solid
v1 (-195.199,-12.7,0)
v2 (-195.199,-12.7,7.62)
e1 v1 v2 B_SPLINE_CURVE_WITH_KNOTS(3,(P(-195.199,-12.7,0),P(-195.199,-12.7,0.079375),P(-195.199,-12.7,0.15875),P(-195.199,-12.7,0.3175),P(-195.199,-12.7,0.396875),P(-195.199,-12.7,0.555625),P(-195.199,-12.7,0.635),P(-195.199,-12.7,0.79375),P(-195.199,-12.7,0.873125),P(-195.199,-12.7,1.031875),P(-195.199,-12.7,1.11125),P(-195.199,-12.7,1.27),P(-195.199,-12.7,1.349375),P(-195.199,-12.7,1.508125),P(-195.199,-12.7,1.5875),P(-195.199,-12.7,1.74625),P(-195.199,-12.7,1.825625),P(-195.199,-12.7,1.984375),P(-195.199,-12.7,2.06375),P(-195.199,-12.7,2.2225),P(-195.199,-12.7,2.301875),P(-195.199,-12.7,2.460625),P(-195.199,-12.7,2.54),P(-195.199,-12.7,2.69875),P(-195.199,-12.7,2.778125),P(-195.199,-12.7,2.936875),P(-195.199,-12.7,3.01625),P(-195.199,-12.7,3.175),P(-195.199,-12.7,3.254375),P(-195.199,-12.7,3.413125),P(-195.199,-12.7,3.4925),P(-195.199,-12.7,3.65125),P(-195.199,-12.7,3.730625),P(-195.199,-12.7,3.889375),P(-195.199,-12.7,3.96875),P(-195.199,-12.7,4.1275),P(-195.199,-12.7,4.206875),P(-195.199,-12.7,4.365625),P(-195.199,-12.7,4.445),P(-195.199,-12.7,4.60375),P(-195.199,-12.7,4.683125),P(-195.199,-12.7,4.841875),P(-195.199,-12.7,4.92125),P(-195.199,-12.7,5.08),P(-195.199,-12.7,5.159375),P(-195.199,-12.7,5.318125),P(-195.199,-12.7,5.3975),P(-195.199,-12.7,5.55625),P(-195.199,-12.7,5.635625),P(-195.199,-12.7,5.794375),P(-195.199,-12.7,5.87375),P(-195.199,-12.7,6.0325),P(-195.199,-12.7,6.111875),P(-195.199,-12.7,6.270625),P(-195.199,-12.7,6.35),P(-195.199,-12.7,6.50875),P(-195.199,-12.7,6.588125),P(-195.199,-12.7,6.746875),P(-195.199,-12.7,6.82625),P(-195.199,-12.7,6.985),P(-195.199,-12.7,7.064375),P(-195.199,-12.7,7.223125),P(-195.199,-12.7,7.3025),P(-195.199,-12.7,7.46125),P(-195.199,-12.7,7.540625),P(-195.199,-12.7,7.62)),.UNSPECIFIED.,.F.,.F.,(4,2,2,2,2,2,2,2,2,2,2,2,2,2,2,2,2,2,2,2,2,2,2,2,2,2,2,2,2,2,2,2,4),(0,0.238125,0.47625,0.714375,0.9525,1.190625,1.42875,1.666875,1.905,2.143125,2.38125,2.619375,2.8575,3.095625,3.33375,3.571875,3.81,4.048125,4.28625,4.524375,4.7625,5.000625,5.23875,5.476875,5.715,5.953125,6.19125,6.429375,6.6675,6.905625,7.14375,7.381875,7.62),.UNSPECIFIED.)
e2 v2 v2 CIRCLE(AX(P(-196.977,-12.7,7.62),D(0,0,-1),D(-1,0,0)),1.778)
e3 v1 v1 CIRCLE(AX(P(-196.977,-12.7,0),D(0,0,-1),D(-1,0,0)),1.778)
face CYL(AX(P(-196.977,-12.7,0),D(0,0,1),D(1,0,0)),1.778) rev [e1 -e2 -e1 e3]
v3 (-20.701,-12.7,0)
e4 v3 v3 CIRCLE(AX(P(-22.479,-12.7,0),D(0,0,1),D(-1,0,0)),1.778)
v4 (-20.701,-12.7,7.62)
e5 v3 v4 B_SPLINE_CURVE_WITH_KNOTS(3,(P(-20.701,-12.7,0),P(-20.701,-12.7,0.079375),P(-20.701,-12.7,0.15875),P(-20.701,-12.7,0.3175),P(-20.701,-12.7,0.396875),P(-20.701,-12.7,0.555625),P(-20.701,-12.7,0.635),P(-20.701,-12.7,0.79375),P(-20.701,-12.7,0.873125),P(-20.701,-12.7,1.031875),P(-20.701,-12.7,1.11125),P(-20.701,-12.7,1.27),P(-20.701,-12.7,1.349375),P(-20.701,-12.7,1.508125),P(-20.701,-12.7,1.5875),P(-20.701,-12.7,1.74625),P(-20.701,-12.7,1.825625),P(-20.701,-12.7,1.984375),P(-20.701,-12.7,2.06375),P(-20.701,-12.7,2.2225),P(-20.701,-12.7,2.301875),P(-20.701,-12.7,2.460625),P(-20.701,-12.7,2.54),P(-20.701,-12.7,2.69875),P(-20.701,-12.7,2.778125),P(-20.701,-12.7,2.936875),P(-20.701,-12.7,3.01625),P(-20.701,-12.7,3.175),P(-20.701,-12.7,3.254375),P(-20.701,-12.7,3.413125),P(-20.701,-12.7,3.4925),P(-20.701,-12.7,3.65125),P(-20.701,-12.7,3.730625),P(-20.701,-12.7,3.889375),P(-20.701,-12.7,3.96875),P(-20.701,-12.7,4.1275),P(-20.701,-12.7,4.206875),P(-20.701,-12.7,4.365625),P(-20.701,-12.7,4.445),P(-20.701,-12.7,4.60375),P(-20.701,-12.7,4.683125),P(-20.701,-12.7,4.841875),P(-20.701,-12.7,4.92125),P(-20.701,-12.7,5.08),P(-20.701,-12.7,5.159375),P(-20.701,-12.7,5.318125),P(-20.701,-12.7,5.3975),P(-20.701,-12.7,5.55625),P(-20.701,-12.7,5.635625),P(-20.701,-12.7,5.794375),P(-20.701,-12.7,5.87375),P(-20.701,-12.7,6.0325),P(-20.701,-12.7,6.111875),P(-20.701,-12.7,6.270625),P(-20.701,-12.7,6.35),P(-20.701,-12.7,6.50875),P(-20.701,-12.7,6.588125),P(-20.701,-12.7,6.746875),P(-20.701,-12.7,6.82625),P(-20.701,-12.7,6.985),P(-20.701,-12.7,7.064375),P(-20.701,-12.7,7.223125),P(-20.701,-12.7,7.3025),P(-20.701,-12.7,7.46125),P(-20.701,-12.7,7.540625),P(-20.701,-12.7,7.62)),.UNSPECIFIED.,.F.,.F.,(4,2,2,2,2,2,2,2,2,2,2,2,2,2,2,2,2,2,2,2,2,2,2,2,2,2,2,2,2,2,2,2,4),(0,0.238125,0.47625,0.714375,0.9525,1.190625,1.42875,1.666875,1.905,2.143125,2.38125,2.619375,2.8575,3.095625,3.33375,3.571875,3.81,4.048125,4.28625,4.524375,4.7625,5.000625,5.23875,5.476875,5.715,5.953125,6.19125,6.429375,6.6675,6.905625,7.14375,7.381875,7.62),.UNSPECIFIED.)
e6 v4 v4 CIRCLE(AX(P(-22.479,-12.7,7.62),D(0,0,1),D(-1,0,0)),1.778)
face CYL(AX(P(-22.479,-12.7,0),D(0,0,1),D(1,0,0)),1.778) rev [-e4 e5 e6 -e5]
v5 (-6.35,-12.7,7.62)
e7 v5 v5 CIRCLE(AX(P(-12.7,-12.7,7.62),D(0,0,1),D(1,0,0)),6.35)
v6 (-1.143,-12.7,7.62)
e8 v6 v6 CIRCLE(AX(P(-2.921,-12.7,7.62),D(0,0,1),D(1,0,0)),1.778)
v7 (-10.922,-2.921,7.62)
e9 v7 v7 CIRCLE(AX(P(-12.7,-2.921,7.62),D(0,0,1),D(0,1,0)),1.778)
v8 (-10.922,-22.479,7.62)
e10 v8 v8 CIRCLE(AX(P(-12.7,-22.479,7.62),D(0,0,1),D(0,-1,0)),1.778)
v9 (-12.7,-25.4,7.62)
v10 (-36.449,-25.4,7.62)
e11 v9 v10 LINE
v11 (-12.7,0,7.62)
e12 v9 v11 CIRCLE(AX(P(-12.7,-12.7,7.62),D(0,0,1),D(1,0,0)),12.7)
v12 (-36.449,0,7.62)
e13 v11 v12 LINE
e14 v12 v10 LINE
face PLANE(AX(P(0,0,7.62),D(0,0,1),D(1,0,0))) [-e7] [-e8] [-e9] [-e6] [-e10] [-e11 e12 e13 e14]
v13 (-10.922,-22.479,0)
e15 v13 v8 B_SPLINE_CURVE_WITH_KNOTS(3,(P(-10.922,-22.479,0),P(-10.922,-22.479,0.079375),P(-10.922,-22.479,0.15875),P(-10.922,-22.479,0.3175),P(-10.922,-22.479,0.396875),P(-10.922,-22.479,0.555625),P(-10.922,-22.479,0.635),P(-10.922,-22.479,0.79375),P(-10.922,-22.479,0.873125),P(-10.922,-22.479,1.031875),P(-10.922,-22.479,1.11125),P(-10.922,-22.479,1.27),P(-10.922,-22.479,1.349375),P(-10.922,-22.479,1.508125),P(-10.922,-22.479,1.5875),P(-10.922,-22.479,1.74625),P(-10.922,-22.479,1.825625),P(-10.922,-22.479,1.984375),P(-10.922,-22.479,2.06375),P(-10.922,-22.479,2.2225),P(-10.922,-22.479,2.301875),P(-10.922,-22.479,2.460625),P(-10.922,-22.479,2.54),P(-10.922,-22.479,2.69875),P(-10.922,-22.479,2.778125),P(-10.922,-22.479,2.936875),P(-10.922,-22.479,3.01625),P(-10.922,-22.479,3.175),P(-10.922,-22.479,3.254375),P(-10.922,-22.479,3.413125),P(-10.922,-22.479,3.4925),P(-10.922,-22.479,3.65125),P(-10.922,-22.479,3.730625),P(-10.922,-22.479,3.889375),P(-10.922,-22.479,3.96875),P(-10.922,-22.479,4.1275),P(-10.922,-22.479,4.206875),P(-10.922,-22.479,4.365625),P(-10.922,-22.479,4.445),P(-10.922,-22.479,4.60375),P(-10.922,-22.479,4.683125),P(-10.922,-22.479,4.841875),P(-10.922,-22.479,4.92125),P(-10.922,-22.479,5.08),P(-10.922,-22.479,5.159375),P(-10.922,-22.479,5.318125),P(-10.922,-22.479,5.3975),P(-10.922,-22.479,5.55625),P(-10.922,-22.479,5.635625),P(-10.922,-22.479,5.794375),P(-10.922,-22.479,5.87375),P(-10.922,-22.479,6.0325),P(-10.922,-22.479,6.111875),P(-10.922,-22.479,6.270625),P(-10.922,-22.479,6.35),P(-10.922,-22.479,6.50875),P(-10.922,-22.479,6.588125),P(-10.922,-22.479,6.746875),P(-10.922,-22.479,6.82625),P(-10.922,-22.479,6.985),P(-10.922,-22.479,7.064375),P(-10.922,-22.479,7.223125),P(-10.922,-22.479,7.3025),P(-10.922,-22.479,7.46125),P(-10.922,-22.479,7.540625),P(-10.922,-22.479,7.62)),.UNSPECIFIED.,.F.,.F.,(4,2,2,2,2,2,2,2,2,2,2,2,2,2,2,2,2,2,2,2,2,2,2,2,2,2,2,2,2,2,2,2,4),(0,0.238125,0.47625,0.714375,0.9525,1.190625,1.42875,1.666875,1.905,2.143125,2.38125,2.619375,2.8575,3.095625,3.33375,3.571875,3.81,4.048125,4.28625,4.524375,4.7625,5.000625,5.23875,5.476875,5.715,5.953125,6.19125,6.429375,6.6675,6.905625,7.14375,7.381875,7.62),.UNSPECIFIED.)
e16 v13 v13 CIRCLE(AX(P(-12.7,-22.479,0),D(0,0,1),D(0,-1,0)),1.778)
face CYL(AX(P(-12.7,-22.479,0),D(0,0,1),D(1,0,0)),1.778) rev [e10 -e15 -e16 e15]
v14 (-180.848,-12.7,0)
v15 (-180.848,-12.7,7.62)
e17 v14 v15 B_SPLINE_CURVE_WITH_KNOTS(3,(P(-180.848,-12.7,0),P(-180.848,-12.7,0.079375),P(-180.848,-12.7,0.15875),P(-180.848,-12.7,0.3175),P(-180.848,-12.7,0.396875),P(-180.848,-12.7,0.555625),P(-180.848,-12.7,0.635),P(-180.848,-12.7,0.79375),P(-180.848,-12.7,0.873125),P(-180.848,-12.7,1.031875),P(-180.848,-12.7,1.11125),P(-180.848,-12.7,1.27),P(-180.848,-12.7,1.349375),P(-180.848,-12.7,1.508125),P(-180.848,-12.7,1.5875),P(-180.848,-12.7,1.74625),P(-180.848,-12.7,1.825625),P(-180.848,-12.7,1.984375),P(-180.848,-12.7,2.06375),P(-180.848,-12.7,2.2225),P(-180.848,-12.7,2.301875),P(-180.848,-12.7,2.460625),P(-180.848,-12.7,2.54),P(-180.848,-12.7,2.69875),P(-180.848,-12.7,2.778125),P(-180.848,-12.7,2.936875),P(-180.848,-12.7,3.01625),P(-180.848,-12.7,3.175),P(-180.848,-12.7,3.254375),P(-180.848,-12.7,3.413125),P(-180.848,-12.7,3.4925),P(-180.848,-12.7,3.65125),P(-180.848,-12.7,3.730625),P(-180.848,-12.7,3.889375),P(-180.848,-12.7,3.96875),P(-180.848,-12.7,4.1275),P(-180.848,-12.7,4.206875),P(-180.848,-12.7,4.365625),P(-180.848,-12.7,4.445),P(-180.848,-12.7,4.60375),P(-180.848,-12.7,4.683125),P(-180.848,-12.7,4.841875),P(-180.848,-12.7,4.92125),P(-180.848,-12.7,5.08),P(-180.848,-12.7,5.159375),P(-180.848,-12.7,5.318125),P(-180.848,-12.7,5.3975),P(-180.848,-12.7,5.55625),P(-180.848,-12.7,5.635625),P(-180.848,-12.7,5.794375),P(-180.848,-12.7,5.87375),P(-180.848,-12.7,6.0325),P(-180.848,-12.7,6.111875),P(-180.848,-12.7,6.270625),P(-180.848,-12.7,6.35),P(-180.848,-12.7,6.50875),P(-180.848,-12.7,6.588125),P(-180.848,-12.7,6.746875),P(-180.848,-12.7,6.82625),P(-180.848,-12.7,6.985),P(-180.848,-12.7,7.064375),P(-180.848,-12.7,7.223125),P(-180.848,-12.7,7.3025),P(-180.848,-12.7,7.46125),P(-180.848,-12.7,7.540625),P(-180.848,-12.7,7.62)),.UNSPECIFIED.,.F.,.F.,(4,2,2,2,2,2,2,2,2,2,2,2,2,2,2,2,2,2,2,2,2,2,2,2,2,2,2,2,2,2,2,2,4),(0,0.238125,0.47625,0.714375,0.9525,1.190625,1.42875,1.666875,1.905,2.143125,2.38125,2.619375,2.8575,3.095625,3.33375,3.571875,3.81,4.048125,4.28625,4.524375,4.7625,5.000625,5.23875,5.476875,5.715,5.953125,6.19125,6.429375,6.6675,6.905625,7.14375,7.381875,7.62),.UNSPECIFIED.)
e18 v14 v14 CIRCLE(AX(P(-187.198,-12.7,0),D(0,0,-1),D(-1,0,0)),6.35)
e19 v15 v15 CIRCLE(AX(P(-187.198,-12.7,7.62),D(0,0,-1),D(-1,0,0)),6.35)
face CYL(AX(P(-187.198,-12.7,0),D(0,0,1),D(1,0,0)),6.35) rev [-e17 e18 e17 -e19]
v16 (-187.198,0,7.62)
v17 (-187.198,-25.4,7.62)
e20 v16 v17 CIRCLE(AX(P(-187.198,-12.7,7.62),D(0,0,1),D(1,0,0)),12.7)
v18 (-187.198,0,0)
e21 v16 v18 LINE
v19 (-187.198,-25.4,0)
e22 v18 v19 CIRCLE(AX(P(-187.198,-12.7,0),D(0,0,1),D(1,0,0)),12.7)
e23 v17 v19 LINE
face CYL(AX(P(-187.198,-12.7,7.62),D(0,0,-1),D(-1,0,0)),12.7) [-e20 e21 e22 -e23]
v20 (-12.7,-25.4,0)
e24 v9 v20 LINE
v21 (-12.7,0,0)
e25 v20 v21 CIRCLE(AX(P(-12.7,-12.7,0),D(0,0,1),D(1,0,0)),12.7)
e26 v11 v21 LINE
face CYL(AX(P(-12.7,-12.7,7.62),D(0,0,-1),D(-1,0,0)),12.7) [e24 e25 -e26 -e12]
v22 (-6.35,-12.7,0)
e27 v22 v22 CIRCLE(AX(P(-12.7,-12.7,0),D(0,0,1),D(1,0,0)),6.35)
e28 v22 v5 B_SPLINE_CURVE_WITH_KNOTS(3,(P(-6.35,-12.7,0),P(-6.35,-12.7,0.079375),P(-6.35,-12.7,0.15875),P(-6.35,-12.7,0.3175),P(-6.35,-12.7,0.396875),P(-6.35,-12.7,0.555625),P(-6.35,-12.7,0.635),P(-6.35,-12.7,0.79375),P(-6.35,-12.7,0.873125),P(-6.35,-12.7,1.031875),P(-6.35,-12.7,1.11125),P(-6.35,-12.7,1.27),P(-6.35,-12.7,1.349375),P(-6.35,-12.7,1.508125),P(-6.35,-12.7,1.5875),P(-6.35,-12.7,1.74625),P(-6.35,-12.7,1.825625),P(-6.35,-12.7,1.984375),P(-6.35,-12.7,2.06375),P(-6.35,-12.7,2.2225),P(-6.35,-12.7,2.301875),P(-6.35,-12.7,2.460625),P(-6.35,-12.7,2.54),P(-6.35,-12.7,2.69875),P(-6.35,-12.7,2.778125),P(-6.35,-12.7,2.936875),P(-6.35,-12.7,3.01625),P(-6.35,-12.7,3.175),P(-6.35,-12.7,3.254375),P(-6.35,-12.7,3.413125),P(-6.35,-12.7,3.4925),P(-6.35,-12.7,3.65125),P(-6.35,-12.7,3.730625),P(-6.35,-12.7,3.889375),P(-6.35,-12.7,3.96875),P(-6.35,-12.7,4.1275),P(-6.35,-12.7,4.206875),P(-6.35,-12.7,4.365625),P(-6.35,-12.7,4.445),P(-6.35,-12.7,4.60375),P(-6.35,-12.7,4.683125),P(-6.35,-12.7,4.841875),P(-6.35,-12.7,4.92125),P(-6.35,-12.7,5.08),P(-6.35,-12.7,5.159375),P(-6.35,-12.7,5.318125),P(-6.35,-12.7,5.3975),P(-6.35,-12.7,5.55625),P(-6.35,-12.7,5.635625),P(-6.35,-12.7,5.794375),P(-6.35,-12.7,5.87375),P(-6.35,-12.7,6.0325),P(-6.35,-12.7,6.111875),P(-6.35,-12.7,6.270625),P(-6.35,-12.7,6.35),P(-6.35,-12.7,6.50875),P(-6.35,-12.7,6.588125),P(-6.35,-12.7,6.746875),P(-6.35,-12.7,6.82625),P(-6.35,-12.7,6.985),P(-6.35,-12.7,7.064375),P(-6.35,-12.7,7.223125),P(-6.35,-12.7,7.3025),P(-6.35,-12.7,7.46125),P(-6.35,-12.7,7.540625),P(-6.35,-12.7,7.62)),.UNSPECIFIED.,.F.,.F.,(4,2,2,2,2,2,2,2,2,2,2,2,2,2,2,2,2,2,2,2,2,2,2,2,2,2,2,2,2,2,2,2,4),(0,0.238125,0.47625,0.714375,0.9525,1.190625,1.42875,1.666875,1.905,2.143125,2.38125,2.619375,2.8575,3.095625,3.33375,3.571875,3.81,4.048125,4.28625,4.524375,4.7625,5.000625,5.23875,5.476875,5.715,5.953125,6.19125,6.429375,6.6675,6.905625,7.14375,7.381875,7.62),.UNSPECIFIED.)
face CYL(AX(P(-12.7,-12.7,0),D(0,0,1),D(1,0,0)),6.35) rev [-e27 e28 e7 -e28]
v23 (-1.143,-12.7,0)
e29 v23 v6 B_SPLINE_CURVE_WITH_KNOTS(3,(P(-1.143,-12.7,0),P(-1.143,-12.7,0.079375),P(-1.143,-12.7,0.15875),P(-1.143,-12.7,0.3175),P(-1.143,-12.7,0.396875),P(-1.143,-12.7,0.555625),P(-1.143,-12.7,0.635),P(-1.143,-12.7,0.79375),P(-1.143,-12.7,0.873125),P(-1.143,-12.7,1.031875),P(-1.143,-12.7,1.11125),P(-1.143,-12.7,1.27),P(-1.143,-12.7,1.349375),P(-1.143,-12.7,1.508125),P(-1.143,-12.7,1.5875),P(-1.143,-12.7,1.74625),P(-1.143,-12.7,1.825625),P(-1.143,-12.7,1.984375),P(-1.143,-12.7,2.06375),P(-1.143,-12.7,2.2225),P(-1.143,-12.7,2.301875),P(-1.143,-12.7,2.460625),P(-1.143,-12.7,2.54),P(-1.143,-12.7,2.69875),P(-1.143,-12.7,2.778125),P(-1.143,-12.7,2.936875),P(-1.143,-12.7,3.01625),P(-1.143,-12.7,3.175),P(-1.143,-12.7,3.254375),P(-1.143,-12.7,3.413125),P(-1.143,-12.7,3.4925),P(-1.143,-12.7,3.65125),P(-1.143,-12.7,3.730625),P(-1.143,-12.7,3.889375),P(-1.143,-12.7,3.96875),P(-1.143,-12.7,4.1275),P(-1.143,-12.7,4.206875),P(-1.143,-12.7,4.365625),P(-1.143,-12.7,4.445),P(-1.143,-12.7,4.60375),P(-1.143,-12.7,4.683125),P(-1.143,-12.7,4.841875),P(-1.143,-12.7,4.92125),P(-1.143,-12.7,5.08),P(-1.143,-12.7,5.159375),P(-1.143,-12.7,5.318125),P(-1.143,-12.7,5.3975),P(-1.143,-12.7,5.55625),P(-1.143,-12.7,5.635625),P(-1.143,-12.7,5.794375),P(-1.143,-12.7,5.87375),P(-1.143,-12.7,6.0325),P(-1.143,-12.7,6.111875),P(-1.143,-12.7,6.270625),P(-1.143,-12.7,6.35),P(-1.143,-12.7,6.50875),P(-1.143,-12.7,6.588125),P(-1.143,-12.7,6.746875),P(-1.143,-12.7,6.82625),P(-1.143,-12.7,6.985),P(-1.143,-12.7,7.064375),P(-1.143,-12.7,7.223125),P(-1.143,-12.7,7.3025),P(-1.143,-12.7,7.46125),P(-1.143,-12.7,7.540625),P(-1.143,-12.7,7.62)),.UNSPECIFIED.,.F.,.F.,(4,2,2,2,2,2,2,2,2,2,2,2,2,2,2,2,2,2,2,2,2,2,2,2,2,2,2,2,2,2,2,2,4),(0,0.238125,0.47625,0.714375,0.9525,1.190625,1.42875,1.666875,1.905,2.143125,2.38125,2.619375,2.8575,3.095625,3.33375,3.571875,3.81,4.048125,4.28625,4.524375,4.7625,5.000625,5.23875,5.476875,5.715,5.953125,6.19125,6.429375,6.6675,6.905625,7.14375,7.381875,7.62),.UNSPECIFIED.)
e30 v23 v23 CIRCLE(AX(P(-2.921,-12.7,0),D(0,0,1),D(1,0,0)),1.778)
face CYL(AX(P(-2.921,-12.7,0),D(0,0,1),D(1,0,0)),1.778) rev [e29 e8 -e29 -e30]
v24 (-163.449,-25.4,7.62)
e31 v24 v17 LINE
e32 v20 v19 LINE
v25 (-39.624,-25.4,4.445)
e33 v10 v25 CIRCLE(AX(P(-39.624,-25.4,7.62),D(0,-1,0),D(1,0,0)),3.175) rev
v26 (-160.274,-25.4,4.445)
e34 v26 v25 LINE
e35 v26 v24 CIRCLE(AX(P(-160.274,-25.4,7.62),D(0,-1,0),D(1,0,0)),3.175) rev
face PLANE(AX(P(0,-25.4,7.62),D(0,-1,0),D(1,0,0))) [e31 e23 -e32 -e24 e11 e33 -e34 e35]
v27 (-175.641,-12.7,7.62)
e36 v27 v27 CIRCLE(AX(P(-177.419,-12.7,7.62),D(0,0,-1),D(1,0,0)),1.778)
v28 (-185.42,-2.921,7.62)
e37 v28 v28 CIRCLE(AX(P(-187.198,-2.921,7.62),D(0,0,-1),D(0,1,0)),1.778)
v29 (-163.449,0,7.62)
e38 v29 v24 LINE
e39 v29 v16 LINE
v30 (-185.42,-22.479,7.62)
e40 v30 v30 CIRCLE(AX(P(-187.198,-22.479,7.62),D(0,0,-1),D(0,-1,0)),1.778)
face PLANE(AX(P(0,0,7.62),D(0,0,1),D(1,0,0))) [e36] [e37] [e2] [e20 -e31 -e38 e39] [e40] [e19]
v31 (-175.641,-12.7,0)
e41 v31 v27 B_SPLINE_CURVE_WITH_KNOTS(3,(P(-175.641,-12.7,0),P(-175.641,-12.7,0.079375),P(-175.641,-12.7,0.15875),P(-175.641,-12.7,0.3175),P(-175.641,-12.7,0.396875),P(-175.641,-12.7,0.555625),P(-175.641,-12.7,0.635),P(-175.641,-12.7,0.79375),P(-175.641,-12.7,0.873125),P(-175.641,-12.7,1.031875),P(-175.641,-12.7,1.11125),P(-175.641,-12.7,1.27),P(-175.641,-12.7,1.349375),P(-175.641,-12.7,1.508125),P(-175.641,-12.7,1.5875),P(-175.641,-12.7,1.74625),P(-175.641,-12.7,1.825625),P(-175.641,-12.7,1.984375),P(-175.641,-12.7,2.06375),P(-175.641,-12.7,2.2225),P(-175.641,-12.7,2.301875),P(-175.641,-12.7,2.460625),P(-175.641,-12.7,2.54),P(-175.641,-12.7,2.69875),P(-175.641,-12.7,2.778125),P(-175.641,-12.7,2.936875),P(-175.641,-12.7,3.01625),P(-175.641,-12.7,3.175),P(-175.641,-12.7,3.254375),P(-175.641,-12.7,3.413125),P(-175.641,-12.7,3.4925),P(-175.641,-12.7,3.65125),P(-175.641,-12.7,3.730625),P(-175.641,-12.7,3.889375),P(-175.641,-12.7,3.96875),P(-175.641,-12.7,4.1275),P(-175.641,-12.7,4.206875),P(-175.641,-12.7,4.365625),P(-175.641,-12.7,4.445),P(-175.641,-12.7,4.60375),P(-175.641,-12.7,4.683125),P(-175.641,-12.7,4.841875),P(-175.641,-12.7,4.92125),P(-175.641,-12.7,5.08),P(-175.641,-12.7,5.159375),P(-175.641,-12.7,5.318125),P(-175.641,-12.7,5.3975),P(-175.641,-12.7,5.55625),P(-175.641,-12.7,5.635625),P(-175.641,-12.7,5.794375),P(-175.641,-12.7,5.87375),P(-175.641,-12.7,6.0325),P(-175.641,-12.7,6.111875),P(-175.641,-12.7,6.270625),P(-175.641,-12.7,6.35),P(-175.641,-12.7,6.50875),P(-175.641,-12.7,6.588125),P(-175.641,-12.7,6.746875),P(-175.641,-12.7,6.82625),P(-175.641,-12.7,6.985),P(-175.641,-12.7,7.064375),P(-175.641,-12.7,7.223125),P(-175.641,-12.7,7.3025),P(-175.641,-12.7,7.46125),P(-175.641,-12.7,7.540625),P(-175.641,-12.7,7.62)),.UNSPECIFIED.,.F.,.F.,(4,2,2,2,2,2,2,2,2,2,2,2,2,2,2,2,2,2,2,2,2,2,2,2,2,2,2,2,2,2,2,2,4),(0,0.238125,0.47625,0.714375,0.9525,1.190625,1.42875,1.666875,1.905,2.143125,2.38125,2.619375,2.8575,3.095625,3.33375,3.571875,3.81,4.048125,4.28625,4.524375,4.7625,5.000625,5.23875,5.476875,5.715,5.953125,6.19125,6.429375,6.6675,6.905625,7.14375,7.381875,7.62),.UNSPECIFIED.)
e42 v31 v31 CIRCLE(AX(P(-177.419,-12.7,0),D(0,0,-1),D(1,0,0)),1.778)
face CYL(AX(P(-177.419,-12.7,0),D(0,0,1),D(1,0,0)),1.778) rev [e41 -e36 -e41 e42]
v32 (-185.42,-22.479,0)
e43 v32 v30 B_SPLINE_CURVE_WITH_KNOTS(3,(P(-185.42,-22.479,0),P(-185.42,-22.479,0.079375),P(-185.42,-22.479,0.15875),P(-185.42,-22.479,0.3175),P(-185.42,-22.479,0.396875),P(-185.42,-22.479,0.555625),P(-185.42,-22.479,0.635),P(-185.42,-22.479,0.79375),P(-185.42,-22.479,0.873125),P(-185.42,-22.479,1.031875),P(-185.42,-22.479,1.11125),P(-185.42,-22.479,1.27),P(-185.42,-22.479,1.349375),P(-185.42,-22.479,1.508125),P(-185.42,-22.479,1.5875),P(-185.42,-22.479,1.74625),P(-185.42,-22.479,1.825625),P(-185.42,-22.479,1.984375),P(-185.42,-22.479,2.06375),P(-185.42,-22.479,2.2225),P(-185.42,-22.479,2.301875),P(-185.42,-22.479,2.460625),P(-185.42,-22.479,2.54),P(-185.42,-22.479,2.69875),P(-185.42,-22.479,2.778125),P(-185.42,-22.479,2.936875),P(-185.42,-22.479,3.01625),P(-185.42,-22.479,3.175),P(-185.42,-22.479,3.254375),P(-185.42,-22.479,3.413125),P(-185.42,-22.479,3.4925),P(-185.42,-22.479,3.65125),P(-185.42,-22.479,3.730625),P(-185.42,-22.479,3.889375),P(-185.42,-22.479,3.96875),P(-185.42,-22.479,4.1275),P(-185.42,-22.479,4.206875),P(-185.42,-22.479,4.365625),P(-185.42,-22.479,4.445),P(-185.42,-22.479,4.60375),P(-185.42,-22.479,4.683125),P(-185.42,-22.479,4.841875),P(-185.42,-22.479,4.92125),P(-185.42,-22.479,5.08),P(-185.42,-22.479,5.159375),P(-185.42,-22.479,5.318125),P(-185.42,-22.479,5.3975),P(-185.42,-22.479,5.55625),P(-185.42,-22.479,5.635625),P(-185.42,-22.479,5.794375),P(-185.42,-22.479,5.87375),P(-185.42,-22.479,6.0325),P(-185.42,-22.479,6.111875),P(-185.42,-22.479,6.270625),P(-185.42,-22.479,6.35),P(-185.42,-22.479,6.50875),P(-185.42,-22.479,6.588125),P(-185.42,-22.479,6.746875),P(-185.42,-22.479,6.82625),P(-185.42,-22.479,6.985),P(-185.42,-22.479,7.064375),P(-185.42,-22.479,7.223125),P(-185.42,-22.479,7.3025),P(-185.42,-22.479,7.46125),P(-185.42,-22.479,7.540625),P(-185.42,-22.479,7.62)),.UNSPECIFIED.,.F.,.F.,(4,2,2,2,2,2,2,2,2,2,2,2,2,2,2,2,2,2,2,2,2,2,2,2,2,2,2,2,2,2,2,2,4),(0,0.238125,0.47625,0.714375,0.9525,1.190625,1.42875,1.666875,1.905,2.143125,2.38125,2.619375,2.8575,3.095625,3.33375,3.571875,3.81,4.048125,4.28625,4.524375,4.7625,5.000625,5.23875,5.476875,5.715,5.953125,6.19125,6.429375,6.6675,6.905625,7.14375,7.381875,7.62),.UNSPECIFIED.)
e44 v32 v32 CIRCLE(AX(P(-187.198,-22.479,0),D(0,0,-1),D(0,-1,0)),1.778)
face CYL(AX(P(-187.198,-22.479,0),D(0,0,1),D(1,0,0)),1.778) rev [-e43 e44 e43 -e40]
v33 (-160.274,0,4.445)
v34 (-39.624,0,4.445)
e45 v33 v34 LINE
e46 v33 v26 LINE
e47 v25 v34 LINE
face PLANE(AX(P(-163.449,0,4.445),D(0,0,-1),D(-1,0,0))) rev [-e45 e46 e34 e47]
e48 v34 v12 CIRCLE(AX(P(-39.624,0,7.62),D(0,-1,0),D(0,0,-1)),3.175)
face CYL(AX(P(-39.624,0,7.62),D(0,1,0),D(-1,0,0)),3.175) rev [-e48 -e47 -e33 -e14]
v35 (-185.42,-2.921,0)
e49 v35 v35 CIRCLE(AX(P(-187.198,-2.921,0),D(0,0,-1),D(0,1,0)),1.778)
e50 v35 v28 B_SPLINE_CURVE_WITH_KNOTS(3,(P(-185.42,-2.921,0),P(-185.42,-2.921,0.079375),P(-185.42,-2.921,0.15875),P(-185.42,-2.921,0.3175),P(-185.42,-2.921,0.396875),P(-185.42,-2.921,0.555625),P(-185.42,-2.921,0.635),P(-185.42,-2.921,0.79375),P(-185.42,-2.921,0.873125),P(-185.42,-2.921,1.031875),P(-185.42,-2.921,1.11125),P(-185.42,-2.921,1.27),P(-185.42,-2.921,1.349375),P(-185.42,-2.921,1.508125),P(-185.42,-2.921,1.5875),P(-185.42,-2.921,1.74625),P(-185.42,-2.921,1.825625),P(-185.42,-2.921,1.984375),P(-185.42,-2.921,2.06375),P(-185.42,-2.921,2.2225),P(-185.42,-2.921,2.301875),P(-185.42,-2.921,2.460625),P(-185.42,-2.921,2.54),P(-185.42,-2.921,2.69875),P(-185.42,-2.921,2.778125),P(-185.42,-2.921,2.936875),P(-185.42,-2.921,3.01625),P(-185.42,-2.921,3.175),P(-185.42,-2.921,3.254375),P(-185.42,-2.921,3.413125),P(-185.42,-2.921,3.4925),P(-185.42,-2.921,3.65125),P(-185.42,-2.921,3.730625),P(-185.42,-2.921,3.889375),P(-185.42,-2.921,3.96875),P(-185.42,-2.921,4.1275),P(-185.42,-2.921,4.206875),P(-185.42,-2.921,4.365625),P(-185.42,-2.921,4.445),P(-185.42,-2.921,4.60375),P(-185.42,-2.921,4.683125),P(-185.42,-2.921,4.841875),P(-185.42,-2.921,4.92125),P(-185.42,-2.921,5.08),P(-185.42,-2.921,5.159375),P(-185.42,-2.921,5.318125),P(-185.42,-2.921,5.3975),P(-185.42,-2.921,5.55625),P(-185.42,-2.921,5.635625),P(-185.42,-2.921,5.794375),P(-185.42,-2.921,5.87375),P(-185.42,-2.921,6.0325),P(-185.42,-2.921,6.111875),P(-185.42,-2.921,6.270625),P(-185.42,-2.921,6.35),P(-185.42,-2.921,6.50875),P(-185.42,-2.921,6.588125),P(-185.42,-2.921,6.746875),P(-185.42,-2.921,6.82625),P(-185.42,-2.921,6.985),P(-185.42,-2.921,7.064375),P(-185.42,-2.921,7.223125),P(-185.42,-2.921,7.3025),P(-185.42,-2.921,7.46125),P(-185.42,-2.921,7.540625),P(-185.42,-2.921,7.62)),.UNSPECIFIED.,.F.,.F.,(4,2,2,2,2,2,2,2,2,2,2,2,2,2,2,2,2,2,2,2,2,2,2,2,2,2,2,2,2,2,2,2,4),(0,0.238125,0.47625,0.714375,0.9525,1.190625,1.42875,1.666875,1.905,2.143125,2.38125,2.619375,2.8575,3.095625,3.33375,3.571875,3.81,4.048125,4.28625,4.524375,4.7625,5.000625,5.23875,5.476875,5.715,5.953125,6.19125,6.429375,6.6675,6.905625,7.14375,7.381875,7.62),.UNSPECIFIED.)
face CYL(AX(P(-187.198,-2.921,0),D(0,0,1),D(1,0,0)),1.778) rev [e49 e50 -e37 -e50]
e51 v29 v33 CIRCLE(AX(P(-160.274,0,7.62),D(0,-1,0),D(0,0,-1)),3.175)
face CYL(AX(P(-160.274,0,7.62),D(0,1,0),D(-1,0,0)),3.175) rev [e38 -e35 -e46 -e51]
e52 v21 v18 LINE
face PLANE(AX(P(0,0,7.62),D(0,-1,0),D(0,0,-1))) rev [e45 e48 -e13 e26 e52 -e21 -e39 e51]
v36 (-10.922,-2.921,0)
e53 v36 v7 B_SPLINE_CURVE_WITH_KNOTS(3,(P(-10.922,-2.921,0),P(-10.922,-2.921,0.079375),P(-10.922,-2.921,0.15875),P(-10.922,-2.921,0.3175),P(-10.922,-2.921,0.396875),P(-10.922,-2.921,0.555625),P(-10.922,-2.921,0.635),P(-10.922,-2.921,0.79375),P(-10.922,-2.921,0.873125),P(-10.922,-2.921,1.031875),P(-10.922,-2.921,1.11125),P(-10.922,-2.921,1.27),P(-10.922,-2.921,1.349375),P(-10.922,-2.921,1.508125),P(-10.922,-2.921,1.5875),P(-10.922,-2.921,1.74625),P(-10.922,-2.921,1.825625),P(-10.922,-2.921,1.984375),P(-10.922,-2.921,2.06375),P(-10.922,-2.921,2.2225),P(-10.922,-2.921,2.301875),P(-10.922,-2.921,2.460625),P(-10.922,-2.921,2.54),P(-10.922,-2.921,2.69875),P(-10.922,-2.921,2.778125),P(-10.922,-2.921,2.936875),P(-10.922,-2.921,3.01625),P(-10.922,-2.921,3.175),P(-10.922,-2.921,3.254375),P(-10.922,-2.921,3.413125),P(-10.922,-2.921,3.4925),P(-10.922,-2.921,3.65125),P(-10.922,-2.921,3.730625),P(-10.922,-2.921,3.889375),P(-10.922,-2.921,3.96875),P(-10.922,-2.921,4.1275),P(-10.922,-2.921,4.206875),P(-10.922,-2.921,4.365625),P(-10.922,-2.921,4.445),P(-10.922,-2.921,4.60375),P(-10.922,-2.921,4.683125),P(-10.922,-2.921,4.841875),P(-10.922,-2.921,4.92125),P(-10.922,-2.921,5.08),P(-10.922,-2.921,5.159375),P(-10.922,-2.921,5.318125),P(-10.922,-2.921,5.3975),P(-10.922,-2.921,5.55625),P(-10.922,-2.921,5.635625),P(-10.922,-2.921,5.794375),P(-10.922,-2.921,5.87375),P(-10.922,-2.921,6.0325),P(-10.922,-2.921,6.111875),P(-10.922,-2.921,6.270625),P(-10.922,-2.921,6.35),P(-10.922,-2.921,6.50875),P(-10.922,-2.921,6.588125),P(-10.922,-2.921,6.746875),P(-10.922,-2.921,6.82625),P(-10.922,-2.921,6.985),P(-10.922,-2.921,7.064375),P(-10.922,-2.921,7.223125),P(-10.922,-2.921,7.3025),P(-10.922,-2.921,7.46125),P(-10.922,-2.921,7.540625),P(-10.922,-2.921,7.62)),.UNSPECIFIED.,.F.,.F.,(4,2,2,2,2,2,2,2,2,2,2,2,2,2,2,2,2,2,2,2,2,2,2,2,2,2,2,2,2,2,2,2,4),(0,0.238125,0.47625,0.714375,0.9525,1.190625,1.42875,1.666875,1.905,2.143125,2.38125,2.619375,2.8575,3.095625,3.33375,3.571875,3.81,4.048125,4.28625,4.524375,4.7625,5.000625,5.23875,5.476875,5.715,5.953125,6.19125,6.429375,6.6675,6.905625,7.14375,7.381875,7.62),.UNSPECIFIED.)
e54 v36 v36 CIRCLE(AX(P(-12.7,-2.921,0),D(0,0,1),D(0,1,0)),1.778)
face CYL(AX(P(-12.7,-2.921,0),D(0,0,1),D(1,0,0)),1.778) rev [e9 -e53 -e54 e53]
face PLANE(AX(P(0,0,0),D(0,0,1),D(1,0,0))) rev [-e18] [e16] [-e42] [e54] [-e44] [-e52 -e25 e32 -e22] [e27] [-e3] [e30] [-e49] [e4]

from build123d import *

# Parameters (mm, degrees)
SKETCH1_R               = 12.7
BOSS_EXTRUDE1_DEPTH     = 7.62
SKETCH2_R               = 6.35
CUT_EXTRUDE1_DEPTH      = 7.62
SKETCH3_R               = 1.778
CUT_EXTRUDE2_DEPTH      = 7.62
CIRPATTERN1_COUNT       = 4
MIRROR1_COPY_1_SKETCH_R = 1.778
MIRROR1_COPY_1_DEPTH    = 7.62
MIRROR1_COPY_2_SKETCH_R = 1.778
MIRROR1_COPY_2_DEPTH    = 7.62
MIRROR1_COPY_3_SKETCH_R = 1.778
MIRROR1_COPY_3_DEPTH    = 7.62
SKETCH4_W               = 127
SKETCH4_H               = 3.175
CUT_EXTRUDE3_DEPTH      = 25.4
FILLET1_R               = 3.175


with BuildPart() as part:
    # Sketch1 → Boss-Extrude1 (new body)
    with BuildSketch(Plane.XY):
        with BuildLine():
            ThreePointArc((-12.7, -25.4), (-25.4, -12.7), (-12.7, 0))
            Line((-12.7, 0), (-187.198, 0))
            ThreePointArc((-187.198, 0), (-178.217743879, -3.719743879), (-174.498, -12.7))
            ThreePointArc((-174.498, -12.7), (-178.217743879, -21.680256121), (-187.198, -25.4))
            Line((-187.198, -25.4), (-12.7, -25.4))
        make_face()
        with Locations((-187.198, -12.7)):
            Circle(SKETCH1_R)
        with Locations((-12.7, -12.7)):
            Circle(SKETCH1_R)
    extrude(amount=BOSS_EXTRUDE1_DEPTH)

    # Sketch2 → Cut-Extrude1 (cut)
    with BuildSketch(Plane.XY.offset(7.62)):
        with Locations((-12.7, -12.7)):
            Circle(SKETCH2_R)
    cut_extrude1 = extrude(amount=-CUT_EXTRUDE1_DEPTH, mode=Mode.SUBTRACT)

    # Sketch3 → Cut-Extrude2 (cut)
    with BuildSketch(Plane.XY.offset(7.62)):
        with Locations((-2.921, -12.7)):
            Circle(SKETCH3_R)
    cut_extrude2 = extrude(amount=-CUT_EXTRUDE2_DEPTH, mode=Mode.SUBTRACT)

    # CirPattern1: Cut-Extrude2 ×4 about axis
    cirpattern1_axis = Axis((-12.7, -12.7, 0), (0, 0, 1))
    for i in range(1, CIRPATTERN1_COUNT):
        add(cut_extrude2.rotate(cirpattern1_axis, i * 360 / CIRPATTERN1_COUNT), mode=Mode.SUBTRACT)

    # Mirror1: Cut-Extrude1, Cut-Extrude2 across plane
    add(cut_extrude1.mirror(Plane(origin=(-99.949, 0, 0), x_dir=(0, 0, 1), z_dir=(1, 0, 0))), mode=Mode.SUBTRACT)
    add(cut_extrude2.mirror(Plane(origin=(-99.949, 0, 0), x_dir=(0, 0, 1), z_dir=(1, 0, 0))), mode=Mode.SUBTRACT)

    # Mirror1 copy 1 sketch → Mirror1 copy 1 (cut)
    with BuildSketch(Plane(origin=(-174.498, 0, 7.62), x_dir=(0, 1, 0), z_dir=(0, 0, 1))):
        with Locations((-2.921, 12.7)):
            Circle(MIRROR1_COPY_1_SKETCH_R)
    extrude(amount=-MIRROR1_COPY_1_DEPTH, mode=Mode.SUBTRACT)

    # Mirror1 copy 2 sketch → Mirror1 copy 2 (cut)
    with BuildSketch(Plane(origin=(-174.498, -25.4, 7.62), x_dir=(1, 0, 0), z_dir=(0, 0, 1))):
        with Locations((-2.921, 12.7)):
            Circle(MIRROR1_COPY_2_SKETCH_R)
    extrude(amount=-MIRROR1_COPY_2_DEPTH, mode=Mode.SUBTRACT)

    # Mirror1 copy 3 sketch → Mirror1 copy 3 (cut)
    with BuildSketch(Plane(origin=(-199.898, -25.4, 7.62), x_dir=(0, -1, 0), z_dir=(0, 0, 1))):
        with Locations((-2.921, 12.7)):
            Circle(MIRROR1_COPY_3_SKETCH_R)
    extrude(amount=-MIRROR1_COPY_3_DEPTH, mode=Mode.SUBTRACT)

    # Sketch4 → Cut-Extrude3 (cut)
    with BuildSketch(Plane.XZ.offset(25.4)):
        with Locations((-99.949, 6.0325)):
            Rectangle(SKETCH4_W, SKETCH4_H)
    extrude(amount=-CUT_EXTRUDE3_DEPTH, mode=Mode.SUBTRACT)

    # Fillet1
    fillet1_edges = [part.edges().sort_by_distance(p)[0] for p in [
        (-36.449, -12.7, 4.445),
        (-163.449, -12.7, 4.445),
    ]]
    fillet(fillet1_edges, radius=FILLET1_R - 0.0001)  # a hair under: the kernel refuses the full size


solid = part.part
